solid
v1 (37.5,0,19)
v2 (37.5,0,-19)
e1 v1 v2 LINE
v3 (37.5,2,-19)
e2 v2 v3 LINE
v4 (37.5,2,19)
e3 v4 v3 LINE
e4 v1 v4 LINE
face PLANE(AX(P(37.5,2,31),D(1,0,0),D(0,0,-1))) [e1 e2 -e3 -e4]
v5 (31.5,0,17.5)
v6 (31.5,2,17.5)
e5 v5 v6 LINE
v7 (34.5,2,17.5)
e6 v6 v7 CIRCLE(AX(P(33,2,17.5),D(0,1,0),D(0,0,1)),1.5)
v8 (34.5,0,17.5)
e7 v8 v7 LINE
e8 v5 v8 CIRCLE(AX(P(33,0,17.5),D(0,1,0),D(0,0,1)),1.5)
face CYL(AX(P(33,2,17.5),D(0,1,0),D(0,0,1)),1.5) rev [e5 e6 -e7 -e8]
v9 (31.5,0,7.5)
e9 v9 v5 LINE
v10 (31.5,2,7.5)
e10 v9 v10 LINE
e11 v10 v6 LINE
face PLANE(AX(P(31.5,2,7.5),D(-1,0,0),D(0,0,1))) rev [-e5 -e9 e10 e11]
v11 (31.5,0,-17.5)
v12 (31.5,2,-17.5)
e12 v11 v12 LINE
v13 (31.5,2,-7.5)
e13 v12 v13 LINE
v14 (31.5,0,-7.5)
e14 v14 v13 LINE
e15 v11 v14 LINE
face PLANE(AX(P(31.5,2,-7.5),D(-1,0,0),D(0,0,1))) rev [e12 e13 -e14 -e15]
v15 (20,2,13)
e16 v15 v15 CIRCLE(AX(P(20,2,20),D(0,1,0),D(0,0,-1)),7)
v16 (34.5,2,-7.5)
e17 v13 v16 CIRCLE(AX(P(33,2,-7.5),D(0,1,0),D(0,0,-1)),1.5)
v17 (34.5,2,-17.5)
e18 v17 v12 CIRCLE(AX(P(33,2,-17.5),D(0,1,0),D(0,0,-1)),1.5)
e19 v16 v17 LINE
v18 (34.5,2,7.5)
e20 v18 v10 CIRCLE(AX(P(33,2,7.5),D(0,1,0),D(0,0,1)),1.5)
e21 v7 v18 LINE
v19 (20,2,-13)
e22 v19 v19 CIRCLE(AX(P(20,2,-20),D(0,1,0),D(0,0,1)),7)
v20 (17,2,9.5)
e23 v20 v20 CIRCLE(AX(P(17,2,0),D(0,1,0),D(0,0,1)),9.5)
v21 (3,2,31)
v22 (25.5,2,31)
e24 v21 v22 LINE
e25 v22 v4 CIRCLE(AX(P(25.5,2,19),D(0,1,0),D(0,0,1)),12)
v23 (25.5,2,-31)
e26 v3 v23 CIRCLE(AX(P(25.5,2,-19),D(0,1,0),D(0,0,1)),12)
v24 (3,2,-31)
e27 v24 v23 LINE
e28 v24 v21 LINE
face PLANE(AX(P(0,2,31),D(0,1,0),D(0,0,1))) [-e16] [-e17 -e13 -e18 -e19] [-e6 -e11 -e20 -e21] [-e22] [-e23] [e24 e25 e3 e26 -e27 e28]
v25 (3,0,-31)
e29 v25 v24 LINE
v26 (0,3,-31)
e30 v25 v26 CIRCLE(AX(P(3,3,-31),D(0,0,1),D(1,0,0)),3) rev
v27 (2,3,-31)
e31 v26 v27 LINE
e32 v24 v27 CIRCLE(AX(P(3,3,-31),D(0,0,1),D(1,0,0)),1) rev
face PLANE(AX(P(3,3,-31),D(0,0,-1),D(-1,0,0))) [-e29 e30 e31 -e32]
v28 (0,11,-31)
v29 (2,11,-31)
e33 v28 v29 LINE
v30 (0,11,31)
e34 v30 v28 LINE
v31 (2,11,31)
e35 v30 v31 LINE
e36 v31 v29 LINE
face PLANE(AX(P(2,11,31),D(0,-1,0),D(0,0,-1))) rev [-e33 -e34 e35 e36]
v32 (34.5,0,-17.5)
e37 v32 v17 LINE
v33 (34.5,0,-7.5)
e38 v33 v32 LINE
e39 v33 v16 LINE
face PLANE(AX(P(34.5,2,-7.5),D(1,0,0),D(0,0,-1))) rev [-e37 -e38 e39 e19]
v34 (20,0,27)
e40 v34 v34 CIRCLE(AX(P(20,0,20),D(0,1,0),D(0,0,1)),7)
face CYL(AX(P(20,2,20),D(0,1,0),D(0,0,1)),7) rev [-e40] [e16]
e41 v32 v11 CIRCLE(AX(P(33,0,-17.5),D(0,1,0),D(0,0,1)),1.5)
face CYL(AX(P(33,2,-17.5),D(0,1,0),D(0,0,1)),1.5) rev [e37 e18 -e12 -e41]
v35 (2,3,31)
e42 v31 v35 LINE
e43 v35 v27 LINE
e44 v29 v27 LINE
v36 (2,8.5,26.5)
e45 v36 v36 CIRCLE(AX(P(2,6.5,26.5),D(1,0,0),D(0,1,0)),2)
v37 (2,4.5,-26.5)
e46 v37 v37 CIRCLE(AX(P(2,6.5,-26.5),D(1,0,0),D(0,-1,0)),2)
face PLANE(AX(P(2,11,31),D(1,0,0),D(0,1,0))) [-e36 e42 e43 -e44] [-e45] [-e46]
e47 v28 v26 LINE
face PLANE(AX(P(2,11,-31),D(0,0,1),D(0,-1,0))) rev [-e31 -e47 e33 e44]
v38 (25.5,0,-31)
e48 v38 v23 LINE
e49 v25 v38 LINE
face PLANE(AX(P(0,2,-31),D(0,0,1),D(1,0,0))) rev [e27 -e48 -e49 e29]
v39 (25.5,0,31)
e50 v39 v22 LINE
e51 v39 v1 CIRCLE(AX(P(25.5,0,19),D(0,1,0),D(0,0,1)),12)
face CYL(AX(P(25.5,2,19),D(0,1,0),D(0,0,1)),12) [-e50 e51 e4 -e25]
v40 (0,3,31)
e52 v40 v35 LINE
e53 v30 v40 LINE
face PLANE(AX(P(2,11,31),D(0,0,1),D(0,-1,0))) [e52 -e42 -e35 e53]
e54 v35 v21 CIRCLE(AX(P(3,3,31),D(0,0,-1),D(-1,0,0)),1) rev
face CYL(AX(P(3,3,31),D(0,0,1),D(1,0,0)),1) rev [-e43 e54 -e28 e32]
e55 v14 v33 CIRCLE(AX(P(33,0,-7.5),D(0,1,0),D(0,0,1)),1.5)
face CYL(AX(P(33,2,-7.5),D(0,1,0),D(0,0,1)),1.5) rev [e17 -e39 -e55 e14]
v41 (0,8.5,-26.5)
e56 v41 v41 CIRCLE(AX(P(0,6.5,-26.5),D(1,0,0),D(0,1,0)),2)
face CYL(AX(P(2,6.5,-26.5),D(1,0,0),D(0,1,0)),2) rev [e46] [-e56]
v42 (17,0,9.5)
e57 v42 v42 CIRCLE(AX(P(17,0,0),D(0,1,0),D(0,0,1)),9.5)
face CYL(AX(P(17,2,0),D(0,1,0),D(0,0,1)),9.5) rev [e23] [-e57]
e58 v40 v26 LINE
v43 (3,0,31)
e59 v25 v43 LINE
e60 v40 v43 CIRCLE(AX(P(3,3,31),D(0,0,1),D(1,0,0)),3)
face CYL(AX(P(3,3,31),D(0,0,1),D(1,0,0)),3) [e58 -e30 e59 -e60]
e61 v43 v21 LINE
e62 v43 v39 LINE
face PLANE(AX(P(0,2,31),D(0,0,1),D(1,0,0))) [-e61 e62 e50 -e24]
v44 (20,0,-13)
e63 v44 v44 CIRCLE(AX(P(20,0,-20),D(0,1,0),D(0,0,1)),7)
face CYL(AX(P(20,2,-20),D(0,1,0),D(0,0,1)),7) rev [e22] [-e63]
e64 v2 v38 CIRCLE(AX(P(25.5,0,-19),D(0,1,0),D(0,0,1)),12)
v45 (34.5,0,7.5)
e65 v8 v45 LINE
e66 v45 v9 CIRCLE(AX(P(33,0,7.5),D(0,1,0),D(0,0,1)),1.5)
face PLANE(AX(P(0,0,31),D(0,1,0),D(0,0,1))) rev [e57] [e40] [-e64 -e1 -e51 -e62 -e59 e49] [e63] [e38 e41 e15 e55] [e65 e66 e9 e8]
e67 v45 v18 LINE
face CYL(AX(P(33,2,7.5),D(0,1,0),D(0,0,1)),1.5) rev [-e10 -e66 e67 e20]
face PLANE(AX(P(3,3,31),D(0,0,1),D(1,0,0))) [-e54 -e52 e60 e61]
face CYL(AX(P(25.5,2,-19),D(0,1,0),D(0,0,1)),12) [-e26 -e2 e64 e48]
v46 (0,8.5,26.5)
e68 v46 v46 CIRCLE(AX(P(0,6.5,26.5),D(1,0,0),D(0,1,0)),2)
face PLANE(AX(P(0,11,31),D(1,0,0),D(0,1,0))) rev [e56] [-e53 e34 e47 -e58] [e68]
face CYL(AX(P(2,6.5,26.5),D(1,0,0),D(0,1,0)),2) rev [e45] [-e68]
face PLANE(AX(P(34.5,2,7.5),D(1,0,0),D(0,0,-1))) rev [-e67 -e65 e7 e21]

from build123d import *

# Parameters (mm, degrees)
EXTRUDE_1_DEPTH       = 31
SKETCH_2_R            = 2
CUT_EXTRUDE_1_DEPTH   = 49.396797415
SKETCH_3_R            = 9.5
SKETCH_3_R_2          = 7
CUT_EXTRUDE_2_DEPTH   = 50.479793856
FILLET_1_R            = 12
SHEET_START           = -31
SHEET_METAL_1_DEPTH   = 62
SHEET_METAL_1_2_DEPTH = 62


# Read off the part's stored shape, not the designer's step: 转换实体1
with BuildPart() as part:
    # Sketch 1 → 拉伸-薄壁1 (new, symmetric)
    with BuildSketch(Plane.XY):
        Polygon((0, 11), (0, 0), (37.5, 0), (37.5, 2), (2, 2), (2, 11), align=None)
    extrude(amount=EXTRUDE_1_DEPTH, both=True)

    # Sketch 2 → 切除-拉伸1 (cut, through all)
    with BuildSketch(Plane(origin=(2, 0, 0), x_dir=(0, 0, -1), z_dir=(1, 0, 0))):
        with Locations(Location((-26.5, 6.5, 0), (0, 0, 90))):
            Circle(SKETCH_2_R)
        with Locations(Location((26.5, 6.5, 0), (0, 0, 270))):
            Circle(SKETCH_2_R)
    extrude(amount=-CUT_EXTRUDE_1_DEPTH, mode=Mode.SUBTRACT)

    # 草图3 → 切除-拉伸2 (cut, through all)
    with BuildSketch(Plane(origin=(0, 2, 0), x_dir=(1, 0, 0), z_dir=(0, 1, 0))):
        with Locations(Location((17, 0, 0), (0, 0, 270))):
            Circle(SKETCH_3_R)
        with Locations(Location((20, 20, 0), (0, 0, 270))):
            Circle(SKETCH_3_R_2)
        with Locations(Location((20, -20, 0), (0, 0, 90))):
            Circle(SKETCH_3_R_2)
        with BuildLine():
            Line((34.5, -7.5), (34.5, -17.5))
            ThreePointArc((34.5, -17.5), (33, -19), (31.5, -17.5))
            Line((31.5, -17.5), (31.5, -7.5))
            ThreePointArc((31.5, -7.5), (33, -6), (34.5, -7.5))
        make_face()
        with BuildLine():
            Line((34.5, 7.5), (34.5, 17.5))
            ThreePointArc((34.5, 17.5), (33, 19), (31.5, 17.5))
            Line((31.5, 17.5), (31.5, 7.5))
            ThreePointArc((31.5, 7.5), (33, 6), (34.5, 7.5))
        make_face()
    extrude(amount=-CUT_EXTRUDE_2_DEPTH, mode=Mode.SUBTRACT)

    # 圆角1
    fillet_1_edges = [part.edges().sort_by_distance(p)[0] for p in [
        (37.5, 1, -31),
        (37.5, 1, 31),
    ]]
    fillet(fillet_1_edges, radius=FILLET_1_R)

    # Sheet Metal 1 outline → Sheet Metal 1 (cut)
    with BuildSketch(Plane.XY.offset(SHEET_START)):
        with BuildLine():
            ThreePointArc((3, 0), (0.878679656, 0.878679656), (0, 3))
            Line((0, 3), (0, 0))
            Line((0, 0), (3, 0))
        make_face()
    extrude(amount=SHEET_METAL_1_DEPTH, mode=Mode.SUBTRACT)

    # Sheet Metal 1 2 outline → Sheet Metal 1 2 (add)
    with BuildSketch(Plane.XY.offset(SHEET_START)):
        with BuildLine():
            ThreePointArc((3, 2), (2.292893219, 2.292893219), (2, 3))
            Line((2, 3), (2, 2))
            Line((2, 2), (3, 2))
        make_face()
    extrude(amount=SHEET_METAL_1_2_DEPTH)


solid = part.part
